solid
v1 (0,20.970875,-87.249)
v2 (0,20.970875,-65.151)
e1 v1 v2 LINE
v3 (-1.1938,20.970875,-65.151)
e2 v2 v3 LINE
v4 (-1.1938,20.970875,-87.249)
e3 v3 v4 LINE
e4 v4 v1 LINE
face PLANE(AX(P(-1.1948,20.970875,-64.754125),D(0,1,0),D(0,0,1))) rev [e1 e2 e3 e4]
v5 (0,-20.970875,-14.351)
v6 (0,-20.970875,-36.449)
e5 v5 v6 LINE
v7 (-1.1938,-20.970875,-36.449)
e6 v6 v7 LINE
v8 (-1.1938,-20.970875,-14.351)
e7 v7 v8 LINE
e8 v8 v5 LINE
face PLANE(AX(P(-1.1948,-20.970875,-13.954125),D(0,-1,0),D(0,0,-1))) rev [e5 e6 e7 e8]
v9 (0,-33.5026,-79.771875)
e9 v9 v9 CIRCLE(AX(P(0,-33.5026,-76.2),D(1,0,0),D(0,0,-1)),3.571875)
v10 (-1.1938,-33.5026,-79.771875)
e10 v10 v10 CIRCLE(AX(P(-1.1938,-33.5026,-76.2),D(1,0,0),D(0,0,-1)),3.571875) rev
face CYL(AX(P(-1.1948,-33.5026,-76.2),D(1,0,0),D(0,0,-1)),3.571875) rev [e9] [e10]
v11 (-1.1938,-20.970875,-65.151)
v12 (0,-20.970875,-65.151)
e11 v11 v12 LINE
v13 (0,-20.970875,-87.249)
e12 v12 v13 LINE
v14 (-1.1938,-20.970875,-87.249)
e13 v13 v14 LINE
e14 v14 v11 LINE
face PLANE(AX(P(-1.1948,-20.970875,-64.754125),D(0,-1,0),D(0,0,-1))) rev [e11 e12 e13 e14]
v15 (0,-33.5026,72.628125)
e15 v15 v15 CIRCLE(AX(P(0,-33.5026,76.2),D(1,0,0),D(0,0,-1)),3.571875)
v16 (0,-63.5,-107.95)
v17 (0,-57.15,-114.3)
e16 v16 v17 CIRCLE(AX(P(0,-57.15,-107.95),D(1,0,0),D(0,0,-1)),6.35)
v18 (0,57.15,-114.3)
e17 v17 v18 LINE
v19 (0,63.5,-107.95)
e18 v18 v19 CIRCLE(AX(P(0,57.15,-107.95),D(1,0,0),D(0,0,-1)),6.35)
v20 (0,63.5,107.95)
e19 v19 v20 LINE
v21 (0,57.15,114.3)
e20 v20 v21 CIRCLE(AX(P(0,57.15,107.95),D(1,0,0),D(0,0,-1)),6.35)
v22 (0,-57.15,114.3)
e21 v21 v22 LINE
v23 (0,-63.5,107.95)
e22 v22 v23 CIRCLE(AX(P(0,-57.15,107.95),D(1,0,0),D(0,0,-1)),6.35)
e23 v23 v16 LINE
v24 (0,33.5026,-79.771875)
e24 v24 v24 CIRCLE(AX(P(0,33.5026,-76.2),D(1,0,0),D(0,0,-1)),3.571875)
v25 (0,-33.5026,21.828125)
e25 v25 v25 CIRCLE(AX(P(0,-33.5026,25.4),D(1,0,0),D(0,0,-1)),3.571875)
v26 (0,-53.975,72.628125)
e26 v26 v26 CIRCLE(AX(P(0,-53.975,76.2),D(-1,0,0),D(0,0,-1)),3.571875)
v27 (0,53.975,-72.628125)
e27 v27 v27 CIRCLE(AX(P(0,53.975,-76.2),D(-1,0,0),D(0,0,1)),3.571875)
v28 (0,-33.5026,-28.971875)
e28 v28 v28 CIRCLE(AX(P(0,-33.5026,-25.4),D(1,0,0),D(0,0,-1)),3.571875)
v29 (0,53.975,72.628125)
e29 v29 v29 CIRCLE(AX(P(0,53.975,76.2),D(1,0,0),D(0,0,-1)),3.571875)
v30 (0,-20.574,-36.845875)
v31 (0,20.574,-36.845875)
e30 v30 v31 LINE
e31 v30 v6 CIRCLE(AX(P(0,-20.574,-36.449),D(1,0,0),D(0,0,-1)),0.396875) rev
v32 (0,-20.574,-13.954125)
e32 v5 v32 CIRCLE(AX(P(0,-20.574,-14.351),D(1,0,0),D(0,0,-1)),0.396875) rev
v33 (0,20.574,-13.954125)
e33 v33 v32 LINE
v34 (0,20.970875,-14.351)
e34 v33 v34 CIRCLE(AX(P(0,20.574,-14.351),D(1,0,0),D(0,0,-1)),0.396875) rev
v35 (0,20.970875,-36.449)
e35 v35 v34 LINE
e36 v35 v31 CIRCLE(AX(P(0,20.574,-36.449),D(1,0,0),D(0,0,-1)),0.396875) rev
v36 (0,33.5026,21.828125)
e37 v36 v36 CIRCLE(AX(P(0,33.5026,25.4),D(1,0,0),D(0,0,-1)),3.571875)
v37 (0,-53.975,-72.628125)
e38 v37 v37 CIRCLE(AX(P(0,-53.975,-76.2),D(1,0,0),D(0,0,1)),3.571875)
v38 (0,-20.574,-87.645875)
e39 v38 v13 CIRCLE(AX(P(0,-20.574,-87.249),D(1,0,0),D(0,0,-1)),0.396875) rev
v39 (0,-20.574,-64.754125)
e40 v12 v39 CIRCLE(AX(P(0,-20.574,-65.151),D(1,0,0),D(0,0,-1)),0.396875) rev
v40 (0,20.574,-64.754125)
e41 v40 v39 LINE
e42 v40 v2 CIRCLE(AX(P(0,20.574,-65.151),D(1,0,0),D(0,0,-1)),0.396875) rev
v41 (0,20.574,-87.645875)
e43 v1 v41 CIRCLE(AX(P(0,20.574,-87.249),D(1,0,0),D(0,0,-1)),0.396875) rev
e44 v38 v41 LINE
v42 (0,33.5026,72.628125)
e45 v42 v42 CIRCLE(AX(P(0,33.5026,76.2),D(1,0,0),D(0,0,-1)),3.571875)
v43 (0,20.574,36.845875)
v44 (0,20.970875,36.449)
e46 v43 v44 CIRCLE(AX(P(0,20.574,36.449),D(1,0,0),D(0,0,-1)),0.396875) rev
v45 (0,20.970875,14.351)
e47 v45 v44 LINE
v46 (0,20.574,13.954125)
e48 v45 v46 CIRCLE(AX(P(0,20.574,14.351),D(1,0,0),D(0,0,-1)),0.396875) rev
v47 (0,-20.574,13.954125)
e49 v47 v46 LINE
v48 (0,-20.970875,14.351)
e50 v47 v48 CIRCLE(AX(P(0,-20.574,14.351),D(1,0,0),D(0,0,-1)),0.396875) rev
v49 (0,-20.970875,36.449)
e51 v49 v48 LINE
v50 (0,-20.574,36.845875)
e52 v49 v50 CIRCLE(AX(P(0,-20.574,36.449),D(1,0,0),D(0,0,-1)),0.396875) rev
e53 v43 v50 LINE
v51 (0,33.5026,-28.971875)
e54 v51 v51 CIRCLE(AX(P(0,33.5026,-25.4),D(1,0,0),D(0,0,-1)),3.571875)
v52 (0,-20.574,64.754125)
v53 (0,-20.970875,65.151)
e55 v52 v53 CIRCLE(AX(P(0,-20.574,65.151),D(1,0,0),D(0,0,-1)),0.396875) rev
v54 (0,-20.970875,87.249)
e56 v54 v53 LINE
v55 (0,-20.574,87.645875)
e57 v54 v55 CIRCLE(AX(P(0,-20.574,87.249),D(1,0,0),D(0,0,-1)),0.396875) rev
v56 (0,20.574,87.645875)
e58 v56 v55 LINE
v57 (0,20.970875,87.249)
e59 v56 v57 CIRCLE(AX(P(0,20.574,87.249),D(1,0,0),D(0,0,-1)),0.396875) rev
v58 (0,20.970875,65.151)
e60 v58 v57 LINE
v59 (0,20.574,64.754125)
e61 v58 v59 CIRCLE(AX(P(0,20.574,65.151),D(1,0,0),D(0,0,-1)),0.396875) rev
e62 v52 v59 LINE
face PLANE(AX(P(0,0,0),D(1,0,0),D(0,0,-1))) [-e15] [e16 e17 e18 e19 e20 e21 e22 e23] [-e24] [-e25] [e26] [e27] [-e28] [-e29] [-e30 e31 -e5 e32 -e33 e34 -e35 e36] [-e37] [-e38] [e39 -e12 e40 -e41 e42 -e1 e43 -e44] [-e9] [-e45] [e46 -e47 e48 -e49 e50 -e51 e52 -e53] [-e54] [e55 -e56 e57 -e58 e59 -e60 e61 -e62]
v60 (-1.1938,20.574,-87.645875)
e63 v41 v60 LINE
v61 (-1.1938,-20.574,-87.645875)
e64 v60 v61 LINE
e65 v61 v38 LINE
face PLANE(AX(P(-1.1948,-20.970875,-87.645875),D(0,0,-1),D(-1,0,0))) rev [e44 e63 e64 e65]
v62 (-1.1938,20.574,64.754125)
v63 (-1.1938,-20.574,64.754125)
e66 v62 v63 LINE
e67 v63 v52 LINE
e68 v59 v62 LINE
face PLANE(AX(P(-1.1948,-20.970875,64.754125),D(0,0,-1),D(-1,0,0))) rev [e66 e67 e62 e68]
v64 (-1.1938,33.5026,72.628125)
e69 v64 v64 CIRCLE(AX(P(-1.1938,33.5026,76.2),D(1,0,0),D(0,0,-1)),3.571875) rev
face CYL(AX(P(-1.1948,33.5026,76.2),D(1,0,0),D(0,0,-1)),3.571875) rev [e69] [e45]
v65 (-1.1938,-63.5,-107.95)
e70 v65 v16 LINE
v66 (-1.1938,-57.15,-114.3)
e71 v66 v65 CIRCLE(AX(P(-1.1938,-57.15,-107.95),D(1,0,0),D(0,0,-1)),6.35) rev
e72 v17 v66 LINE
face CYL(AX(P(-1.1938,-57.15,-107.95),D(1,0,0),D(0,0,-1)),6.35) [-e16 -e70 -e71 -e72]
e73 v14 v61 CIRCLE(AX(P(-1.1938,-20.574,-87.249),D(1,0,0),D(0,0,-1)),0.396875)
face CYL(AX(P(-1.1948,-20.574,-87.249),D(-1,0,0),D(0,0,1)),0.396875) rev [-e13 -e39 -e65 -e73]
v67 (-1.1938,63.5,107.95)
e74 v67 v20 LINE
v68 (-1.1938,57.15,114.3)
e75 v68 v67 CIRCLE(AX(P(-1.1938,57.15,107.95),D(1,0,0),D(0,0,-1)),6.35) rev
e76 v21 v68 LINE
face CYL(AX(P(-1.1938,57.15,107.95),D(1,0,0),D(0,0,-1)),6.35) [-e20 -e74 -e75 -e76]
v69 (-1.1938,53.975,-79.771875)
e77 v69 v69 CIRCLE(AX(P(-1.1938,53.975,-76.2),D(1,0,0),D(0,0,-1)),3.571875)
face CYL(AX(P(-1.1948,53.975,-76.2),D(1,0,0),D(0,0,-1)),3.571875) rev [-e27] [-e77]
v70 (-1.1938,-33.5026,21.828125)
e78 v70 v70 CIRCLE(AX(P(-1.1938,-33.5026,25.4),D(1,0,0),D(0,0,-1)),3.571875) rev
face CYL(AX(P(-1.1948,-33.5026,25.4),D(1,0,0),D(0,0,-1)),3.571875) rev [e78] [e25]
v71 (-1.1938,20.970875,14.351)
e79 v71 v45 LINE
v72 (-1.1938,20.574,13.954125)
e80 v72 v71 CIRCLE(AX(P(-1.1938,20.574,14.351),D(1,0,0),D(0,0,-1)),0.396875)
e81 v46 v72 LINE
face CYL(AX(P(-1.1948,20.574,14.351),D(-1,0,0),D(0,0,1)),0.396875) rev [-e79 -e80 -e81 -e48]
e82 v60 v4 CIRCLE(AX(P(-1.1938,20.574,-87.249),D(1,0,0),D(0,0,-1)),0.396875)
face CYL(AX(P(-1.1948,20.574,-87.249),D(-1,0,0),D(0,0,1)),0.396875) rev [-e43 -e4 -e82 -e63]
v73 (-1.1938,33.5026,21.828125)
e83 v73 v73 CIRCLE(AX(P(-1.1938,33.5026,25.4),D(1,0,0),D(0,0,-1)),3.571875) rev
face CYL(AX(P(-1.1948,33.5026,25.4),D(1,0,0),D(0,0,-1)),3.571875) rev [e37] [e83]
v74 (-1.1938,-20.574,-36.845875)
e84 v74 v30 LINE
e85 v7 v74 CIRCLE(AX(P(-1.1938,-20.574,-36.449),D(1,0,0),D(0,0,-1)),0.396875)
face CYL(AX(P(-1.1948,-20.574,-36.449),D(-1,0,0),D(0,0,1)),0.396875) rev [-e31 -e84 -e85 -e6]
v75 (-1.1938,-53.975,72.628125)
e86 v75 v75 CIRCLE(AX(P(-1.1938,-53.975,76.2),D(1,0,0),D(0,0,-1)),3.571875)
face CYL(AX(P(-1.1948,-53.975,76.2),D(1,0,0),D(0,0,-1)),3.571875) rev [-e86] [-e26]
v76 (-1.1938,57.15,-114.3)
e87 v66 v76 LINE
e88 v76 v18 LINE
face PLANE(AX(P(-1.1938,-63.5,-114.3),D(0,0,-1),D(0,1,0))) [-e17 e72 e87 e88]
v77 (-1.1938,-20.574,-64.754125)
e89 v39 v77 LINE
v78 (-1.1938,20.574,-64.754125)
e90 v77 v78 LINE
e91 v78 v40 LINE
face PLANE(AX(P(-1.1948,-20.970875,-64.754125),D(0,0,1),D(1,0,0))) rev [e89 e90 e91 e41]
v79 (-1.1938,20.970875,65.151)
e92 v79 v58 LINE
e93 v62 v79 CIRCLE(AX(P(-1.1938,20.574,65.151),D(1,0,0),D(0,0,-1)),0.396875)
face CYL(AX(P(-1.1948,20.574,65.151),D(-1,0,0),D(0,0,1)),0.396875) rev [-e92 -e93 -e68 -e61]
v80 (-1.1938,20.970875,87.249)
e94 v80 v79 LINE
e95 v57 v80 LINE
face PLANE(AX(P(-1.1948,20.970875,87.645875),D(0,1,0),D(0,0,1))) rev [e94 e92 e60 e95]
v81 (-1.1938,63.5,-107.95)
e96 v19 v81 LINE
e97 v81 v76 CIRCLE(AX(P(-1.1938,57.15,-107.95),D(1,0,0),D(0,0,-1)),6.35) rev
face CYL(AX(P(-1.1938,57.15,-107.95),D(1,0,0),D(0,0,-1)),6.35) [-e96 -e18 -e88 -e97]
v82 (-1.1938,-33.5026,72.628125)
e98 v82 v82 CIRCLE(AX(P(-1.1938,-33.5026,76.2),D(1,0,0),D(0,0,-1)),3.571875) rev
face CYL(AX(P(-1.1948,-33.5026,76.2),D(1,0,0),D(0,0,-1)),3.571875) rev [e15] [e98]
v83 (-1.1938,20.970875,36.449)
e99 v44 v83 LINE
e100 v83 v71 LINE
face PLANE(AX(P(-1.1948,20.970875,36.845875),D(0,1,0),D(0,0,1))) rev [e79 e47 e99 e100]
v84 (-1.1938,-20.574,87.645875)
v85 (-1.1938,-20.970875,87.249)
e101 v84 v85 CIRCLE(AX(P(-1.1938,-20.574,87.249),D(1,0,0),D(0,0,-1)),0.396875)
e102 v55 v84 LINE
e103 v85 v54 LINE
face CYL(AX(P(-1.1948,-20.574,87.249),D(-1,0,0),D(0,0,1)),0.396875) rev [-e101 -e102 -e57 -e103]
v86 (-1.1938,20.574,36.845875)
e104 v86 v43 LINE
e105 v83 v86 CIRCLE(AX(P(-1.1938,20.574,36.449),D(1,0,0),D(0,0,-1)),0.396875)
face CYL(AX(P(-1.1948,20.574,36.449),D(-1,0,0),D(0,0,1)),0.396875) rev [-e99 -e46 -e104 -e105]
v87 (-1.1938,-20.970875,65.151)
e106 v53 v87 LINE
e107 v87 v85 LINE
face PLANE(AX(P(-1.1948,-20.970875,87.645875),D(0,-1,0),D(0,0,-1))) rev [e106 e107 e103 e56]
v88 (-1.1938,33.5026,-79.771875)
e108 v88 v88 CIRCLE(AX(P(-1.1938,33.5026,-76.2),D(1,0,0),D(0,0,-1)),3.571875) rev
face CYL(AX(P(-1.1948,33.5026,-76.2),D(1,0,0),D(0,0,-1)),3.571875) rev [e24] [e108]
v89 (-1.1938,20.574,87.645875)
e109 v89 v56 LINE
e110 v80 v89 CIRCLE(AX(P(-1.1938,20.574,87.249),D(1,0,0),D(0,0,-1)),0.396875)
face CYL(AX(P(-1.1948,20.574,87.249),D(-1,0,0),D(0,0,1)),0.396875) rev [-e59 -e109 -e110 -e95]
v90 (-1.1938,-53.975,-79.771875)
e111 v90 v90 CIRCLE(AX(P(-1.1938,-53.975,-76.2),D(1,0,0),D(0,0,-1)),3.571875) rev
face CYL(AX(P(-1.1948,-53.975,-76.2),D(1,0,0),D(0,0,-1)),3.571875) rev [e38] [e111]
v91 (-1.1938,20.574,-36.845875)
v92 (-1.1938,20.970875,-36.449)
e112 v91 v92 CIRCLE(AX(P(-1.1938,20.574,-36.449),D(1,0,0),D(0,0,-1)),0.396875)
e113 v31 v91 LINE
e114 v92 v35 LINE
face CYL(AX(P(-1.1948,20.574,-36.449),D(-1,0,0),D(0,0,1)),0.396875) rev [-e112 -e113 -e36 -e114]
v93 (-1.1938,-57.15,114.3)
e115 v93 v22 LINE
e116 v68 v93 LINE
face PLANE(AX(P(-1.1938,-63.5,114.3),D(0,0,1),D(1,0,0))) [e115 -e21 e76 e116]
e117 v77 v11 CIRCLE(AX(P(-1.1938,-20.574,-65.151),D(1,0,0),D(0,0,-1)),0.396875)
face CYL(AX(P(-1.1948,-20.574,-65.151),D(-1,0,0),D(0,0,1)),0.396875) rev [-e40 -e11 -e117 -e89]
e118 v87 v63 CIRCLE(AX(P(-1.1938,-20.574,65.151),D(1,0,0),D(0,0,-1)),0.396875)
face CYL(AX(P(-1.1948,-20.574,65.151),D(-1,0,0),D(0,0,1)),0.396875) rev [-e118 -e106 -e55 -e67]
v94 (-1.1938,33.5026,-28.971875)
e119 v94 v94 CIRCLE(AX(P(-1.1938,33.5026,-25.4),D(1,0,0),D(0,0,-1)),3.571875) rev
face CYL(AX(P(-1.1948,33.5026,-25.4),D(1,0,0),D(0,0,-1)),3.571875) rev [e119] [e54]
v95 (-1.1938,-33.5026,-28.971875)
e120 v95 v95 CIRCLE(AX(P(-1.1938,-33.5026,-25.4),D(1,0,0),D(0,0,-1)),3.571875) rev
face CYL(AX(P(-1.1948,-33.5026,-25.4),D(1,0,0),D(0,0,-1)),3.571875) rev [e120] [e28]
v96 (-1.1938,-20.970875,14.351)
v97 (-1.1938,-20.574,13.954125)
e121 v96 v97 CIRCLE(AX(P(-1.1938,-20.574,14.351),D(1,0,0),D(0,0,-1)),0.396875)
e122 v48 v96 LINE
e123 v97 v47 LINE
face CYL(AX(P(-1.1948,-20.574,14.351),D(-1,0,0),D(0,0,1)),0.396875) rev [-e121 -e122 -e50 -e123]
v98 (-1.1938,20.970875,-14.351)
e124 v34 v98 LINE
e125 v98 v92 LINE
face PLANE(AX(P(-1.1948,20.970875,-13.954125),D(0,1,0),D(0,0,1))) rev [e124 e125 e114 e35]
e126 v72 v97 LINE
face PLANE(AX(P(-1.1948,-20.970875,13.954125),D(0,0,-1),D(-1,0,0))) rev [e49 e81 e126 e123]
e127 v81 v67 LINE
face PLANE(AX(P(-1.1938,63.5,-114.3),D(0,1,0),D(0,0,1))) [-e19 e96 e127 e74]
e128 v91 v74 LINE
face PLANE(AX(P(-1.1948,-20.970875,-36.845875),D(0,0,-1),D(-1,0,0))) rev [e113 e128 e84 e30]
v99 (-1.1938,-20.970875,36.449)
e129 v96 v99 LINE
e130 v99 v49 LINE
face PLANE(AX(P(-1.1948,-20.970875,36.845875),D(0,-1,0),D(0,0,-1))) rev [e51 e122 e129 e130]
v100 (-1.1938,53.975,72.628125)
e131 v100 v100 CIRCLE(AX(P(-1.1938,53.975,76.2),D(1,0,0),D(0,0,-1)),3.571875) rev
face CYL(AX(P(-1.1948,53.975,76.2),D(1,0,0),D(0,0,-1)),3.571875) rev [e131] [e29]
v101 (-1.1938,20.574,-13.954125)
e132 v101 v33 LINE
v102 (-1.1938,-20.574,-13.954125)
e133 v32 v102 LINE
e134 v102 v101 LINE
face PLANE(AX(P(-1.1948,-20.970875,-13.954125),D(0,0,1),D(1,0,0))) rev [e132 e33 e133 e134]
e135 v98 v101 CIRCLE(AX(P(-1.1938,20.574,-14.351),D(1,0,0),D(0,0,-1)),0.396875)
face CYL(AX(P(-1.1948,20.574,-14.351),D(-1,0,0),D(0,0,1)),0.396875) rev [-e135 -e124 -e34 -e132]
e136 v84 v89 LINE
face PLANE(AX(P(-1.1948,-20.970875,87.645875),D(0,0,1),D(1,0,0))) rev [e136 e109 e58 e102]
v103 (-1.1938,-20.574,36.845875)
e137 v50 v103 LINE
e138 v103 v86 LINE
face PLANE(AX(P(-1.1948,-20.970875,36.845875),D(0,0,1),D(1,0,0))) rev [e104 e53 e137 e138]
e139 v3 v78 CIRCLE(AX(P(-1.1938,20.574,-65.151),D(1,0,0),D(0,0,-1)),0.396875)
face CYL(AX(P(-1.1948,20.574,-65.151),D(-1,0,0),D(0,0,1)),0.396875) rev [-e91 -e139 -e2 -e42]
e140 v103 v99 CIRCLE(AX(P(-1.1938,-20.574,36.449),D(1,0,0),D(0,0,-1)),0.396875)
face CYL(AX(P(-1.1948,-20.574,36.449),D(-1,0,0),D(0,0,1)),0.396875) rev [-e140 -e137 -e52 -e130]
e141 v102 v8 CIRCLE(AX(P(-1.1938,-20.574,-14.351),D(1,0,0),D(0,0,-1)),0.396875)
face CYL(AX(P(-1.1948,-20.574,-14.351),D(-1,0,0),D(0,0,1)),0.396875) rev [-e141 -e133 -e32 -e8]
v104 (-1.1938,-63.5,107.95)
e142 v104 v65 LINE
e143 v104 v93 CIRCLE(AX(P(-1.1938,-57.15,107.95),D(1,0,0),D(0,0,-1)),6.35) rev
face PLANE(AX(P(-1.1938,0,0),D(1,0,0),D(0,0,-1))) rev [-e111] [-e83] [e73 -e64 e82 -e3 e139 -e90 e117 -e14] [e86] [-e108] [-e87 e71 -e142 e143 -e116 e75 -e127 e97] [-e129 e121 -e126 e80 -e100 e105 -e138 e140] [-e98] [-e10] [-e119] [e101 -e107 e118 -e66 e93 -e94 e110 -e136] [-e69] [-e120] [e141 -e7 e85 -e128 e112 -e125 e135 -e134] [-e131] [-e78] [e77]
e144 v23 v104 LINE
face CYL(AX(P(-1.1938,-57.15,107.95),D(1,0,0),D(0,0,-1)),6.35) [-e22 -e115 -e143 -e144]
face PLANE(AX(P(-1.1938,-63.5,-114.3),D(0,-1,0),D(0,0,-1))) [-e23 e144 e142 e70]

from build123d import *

# Parameters (mm, degrees)
SKETCH1_W               = 228.6
SKETCH1_H               = 127
BASE_FLANGE1_DEPTH      = 1.1938
CUT_EXTRUDE1_REACH      = 132.76
SKETCH6_R               = 3.571875
SKETCH6_W               = 22.89175
SKETCH6_H               = 41.94175
LPATTERN1_COUNT         = 4
LPATTERN1_PITCH         = 50.8
CUT_EXTRUDE2_REACH      = 132.76
SKETCH7_R               = 3.571875
MIRROR2_COPY_1_REACH    = 132.76
MIRROR2_COPY_1_SKETCH_R = 3.571875
FILLET1_R               = 6.35
FILLET2_R               = 0.396875


# Sheet-metal steps are written as plain solids
with BuildPart() as part:
    # Sketch1 → Base-Flange1 (new body)
    with BuildSketch(Plane(origin=(0, 0, 0), x_dir=(0, 0, -1), z_dir=(1, 0, 0))):
        Rectangle(SKETCH1_W, SKETCH1_H)
    extrude(amount=-BASE_FLANGE1_DEPTH)

    # Sketch6 → Cut-Extrude1 (cut, up to next)
    with BuildSketch(Plane(origin=(0, 0, 0), x_dir=(0, 0, -1), z_dir=(1, 0, 0)), mode=Mode.PRIVATE) as cut_extrude1_sk1:
        with Locations((-76.2, 33.5026)):
            Circle(SKETCH6_R)
    cut_extrude1_tool1 = extrude(cut_extrude1_sk1.sketch, amount=-CUT_EXTRUDE1_REACH, mode=Mode.PRIVATE) & part.part
    # Sketch6 → Cut-Extrude1 (cut, up to next)
    with BuildSketch(Plane(origin=(0, 0, 0), x_dir=(0, 0, -1), z_dir=(1, 0, 0)), mode=Mode.PRIVATE) as cut_extrude1_sk2:
        with Locations((-76.2, -33.5026)):
            Circle(SKETCH6_R)
    cut_extrude1_tool2 = extrude(cut_extrude1_sk2.sketch, amount=-CUT_EXTRUDE1_REACH, mode=Mode.PRIVATE) & part.part
    # Sketch6 → Cut-Extrude1 (cut, up to next)
    with BuildSketch(Plane(origin=(0, 0, 0), x_dir=(0, 0, -1), z_dir=(1, 0, 0)), mode=Mode.PRIVATE) as cut_extrude1_sk3:
        with Locations((-76.2, 0)):
            Rectangle(SKETCH6_W, SKETCH6_H)
    cut_extrude1_tool3 = extrude(cut_extrude1_sk3.sketch, amount=-CUT_EXTRUDE1_REACH, mode=Mode.PRIVATE) & part.part
    cut_extrude1_1 = cut_extrude1_tool1.solids().sort_by_distance((0, 33.5026, 76.2))[0]
    add(cut_extrude1_1, mode=Mode.SUBTRACT)
    cut_extrude1_2 = cut_extrude1_tool2.solids().sort_by_distance((0, -33.5026, 76.2))[0]
    add(cut_extrude1_2, mode=Mode.SUBTRACT)
    cut_extrude1_3 = cut_extrude1_tool3.solids().sort_by_distance((0, 0, 76.2))[0]
    add(cut_extrude1_3, mode=Mode.SUBTRACT)
    cut_extrude1 = cut_extrude1_1 + cut_extrude1_2 + cut_extrude1_3  # Cut-Extrude1 as one shape, for the pattern or mirror that repeats it

    # LPattern1: Cut-Extrude1 ×4
    with Locations(*[(0, 0, -i * LPATTERN1_PITCH) for i in range(1, LPATTERN1_COUNT)]):
        add(cut_extrude1, mode=Mode.SUBTRACT)

    # Sketch7 → Cut-Extrude2 (cut, up to next)
    with BuildSketch(Plane(origin=(0, 0, 0), x_dir=(0, 0, -1), z_dir=(1, 0, 0)), mode=Mode.PRIVATE) as cut_extrude2_sk1:
        with Locations((-76.2, 53.975)):
            Circle(SKETCH7_R)
    cut_extrude2_tool1 = extrude(cut_extrude2_sk1.sketch, amount=-CUT_EXTRUDE2_REACH, mode=Mode.PRIVATE) & part.part
    cut_extrude2 = cut_extrude2_tool1.solids().sort_by_distance((0, 53.975, 76.2))[0]
    add(cut_extrude2, mode=Mode.SUBTRACT)

    # Mirror1: Cut-Extrude2 across plane
    add(cut_extrude2.mirror(Plane.XY), mode=Mode.SUBTRACT)

    # Mirror2: Cut-Extrude2 across plane
    add(cut_extrude2.mirror(Plane.ZX), mode=Mode.SUBTRACT)

    # Mirror2 copy 1 sketch → Mirror2 copy 1 (cut, up to next)
    with BuildSketch(Plane(origin=(0, 0, 0), x_dir=(0, 0, 1), z_dir=(1, 0, 0)), mode=Mode.PRIVATE) as mirror2_copy_1_sk1:
        with Locations((-76.2, 53.975)):
            Circle(MIRROR2_COPY_1_SKETCH_R)
    mirror2_copy_1_tool1 = extrude(mirror2_copy_1_sk1.sketch, amount=-MIRROR2_COPY_1_REACH, mode=Mode.PRIVATE) & part.part
    add(mirror2_copy_1_tool1.solids().sort_by_distance((0, -53.975, -76.2))[0], mode=Mode.SUBTRACT)

    # Fillet1
    fillet1_edges = [part.edges().sort_by_distance(p)[0] for p in [
        (-0.5969, 63.5, 114.3),
        (-0.5969, 63.5, -114.3),
        (-0.5969, -63.5, -114.3),
        (-0.5969, -63.5, 114.3),
    ]]
    fillet(fillet1_edges, radius=FILLET1_R)

    # Fillet2
    fillet2_edges = [part.edges().sort_by_distance(p)[0] for p in [
        (-0.5969, 20.970875, 64.754125),
        (-0.5969, -20.970875, 64.754125),
        (-0.5969, -20.970875, 87.645875),
        (-0.5969, 20.970875, 87.645875),
        (-0.5969, 20.970875, 13.954125),
        (-0.5969, -20.970875, 13.954125),
        (-0.5969, -20.970875, 36.845875),
        (-0.5969, 20.970875, 36.845875),
        (-0.5969, -20.970875, -36.845875),
        (-0.5969, 20.970875, -36.845875),
        (-0.5969, -20.970875, -13.954125),
        (-0.5969, 20.970875, -13.954125),
        (-0.5969, -20.970875, -87.645875),
        (-0.5969, 20.970875, -87.645875),
        (-0.5969, -20.970875, -64.754125),
        (-0.5969, 20.970875, -64.754125),
    ]]
    fillet(fillet2_edges, radius=FILLET2_R)


solid = part.part
